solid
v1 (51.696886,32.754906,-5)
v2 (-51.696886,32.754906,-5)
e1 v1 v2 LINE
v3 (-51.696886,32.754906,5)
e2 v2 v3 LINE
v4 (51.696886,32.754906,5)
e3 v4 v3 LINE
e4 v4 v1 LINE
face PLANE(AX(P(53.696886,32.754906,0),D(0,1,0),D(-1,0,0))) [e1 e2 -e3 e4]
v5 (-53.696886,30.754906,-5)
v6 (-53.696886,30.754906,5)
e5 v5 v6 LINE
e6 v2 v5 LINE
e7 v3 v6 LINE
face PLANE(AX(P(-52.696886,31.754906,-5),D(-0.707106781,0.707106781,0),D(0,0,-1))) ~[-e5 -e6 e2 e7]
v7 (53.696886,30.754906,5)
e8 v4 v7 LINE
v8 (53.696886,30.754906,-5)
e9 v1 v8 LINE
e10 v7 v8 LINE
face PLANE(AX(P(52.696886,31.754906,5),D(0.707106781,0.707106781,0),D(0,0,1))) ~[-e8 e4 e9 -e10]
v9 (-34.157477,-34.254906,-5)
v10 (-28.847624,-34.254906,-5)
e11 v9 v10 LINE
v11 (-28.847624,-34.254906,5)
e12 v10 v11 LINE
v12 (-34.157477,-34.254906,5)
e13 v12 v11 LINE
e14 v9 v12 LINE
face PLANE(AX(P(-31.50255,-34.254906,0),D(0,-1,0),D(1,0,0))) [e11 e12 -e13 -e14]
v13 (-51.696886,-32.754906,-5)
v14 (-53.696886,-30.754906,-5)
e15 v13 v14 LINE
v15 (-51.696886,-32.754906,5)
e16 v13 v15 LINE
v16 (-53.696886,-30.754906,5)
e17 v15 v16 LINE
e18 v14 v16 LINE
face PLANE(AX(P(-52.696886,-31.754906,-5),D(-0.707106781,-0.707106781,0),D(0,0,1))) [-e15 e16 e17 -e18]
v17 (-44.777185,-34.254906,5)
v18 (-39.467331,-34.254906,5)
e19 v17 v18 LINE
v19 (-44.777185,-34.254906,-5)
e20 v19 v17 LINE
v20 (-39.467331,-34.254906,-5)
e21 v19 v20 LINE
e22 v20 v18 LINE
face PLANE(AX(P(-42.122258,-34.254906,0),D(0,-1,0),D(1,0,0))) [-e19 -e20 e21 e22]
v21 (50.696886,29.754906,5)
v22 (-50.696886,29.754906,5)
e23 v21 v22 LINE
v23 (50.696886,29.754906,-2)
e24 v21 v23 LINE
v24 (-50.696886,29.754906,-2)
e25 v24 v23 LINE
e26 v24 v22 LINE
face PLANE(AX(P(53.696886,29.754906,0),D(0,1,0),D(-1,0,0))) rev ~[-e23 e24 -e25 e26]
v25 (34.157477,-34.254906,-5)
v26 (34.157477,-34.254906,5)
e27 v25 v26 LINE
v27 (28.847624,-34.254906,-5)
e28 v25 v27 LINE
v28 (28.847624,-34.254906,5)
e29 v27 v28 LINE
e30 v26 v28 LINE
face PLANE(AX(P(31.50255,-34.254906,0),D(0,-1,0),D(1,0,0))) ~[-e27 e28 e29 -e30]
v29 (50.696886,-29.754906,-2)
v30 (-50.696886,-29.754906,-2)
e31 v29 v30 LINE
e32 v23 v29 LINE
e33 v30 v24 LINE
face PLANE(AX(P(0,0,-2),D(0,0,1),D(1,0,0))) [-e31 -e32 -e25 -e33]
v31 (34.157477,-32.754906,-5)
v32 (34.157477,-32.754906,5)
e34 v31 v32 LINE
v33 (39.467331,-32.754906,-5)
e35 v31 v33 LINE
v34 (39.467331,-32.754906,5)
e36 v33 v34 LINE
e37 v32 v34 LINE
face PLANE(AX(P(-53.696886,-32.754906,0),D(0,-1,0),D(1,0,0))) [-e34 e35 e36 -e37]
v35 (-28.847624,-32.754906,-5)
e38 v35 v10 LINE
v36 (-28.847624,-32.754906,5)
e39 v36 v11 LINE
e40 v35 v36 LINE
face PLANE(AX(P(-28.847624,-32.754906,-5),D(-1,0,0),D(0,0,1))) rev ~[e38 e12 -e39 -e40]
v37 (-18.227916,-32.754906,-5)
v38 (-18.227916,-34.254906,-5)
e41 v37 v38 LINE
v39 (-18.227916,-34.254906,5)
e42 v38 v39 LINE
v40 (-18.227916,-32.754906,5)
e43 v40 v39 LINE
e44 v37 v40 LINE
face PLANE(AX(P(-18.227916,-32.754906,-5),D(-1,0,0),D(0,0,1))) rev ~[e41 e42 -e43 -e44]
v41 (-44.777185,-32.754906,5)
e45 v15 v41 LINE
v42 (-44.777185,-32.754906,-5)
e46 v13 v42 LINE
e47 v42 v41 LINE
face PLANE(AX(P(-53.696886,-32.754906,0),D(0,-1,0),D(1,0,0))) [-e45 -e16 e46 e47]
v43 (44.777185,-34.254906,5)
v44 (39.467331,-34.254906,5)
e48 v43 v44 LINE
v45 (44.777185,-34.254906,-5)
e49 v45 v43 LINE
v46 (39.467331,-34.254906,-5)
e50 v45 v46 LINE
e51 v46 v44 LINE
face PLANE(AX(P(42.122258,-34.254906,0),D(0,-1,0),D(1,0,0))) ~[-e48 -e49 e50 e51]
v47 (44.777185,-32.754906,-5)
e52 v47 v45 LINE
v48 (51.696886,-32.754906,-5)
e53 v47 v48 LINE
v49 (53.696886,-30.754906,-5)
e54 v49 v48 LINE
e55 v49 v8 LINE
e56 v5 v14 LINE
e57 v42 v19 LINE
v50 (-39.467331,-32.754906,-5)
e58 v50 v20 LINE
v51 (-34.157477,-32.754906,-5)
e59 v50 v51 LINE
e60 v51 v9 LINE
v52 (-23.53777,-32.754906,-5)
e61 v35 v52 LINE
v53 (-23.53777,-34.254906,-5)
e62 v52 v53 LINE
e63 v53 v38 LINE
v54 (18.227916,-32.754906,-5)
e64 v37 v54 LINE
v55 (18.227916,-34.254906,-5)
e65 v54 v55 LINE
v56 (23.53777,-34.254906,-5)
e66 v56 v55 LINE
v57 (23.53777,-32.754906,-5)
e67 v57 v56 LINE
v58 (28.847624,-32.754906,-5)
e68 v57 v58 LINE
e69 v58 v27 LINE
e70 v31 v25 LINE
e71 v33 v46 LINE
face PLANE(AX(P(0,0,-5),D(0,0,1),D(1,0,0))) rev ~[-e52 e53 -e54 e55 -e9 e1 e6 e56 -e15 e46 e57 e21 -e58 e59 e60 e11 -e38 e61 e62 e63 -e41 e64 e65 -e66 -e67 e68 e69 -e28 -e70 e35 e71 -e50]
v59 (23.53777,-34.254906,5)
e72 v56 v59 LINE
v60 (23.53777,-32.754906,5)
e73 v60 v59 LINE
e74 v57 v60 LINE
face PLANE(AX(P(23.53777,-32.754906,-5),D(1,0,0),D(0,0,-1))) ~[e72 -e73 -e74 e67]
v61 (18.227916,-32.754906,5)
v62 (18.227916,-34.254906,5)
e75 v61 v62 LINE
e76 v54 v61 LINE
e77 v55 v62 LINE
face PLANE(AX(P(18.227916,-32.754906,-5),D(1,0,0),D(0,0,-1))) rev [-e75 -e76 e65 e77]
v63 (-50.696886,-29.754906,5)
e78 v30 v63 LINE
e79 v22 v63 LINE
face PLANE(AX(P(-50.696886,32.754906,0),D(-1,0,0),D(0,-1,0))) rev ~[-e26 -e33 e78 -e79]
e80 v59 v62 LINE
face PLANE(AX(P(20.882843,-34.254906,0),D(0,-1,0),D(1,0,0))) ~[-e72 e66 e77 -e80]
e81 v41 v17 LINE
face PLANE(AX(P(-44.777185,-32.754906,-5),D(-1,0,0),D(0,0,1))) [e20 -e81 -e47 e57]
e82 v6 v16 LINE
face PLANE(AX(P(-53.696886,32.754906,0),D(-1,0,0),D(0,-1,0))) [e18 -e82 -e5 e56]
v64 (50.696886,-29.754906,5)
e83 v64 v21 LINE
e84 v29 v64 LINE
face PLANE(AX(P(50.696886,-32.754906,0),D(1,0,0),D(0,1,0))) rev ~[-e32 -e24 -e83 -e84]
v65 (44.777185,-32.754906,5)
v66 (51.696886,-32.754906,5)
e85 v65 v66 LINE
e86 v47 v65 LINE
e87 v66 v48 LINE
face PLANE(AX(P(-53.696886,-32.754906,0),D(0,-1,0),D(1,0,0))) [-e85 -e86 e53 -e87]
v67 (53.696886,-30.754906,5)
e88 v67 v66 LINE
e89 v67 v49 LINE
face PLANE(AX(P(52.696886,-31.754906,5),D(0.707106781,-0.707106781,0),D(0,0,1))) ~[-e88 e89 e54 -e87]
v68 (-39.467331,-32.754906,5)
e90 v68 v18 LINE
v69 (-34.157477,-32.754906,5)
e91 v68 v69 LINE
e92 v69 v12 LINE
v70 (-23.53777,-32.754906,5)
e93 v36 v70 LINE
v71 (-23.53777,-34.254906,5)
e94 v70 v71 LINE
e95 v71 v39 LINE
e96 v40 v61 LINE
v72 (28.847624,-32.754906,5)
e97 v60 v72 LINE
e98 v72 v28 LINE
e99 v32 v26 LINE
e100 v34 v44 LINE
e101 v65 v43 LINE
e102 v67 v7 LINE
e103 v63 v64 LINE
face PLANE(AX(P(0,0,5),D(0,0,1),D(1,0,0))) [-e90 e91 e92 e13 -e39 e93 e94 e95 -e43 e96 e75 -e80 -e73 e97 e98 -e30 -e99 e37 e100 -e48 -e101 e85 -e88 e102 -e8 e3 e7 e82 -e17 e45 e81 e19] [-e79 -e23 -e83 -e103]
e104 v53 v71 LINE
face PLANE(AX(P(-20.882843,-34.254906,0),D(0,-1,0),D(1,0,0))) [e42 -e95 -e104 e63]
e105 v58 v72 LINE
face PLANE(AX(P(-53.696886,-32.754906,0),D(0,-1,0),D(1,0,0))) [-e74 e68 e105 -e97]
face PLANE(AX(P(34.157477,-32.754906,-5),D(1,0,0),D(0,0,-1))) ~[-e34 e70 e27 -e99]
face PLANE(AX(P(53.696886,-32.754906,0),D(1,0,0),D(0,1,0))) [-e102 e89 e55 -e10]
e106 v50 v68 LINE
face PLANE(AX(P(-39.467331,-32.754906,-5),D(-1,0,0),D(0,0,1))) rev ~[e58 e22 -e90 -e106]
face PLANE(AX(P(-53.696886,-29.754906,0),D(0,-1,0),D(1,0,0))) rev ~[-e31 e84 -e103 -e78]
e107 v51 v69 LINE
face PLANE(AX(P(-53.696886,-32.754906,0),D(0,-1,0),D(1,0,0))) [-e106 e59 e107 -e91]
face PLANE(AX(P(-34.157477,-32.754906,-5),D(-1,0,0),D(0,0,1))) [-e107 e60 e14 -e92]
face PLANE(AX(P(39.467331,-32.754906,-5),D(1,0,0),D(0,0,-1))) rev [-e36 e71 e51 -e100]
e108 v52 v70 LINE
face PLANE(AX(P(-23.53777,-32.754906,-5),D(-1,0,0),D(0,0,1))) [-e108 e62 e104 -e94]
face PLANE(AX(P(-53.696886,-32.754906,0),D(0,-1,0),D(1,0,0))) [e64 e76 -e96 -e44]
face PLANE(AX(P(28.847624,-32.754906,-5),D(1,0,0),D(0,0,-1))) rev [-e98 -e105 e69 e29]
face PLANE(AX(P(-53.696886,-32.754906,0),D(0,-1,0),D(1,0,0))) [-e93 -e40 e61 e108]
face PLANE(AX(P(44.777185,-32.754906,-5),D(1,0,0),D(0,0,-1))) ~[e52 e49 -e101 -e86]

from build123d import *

# Parameters (mm, degrees)
F1_DEPTH = 5
F2_T     = -3
F3_SIZE  = 2
F4_W     = 5.3098537028
F4_H     = 10
F5_DEPTH = 1.5


# Not quite as in the source:
# - a pattern or mirror of a feature is missing from the dataset's text; its kind, count and spacing are read off the source's solid


with BuildPart() as f1:
    # F0 (on Top) → F1 (new body, symmetric)
    with BuildSketch(Plane.XY):
        Polygon((53.696885705, 32.7549055219), (0, 32.7549055219), (-53.696885705, 32.7549055219), (-53.696885705, 0), (-53.696885705, -32.7549055219), (0, -32.7549055219), (53.696885705, -32.7549055219), (53.696885705, 0), align=None)
    extrude(amount=F1_DEPTH, both=True)

    # F2
    f2_openings = [f1.faces().sort_by_distance(p)[0] for p in [
        (0, 0, 5),
    ]]
    offset(amount=F2_T, openings=f2_openings)

    # F3
    f3_edges = [f1.edges().sort_by_distance(p)[0] for p in [
        (53.696886, -32.754906, 0),
        (-53.696886, 32.754906, 0),
        (53.696886, 32.754906, 0),
        (-53.696886, -32.754906, 0),
    ]]
    chamfer(f3_edges, length=F3_SIZE)

    # F4 (on face) → F5 (join)
    with BuildSketch(Plane.XZ.offset(32.7549055219)):
        with Locations((-42.1222578734, 0)):
            Rectangle(F4_W, F4_H)
        with Locations((-31.5025504678, 0)):
            Rectangle(F4_W, F4_H)
        with Locations((-20.8828430623, 0)):
            Rectangle(F4_W, F4_H)
    f5 = extrude(amount=F5_DEPTH)

    # F5_copies: F5 across plane
    add(f5.mirror(Plane(origin=(0, 0, 0), x_dir=(0, 0, 1), z_dir=(1, 0, 0))))


solid = f1.part
